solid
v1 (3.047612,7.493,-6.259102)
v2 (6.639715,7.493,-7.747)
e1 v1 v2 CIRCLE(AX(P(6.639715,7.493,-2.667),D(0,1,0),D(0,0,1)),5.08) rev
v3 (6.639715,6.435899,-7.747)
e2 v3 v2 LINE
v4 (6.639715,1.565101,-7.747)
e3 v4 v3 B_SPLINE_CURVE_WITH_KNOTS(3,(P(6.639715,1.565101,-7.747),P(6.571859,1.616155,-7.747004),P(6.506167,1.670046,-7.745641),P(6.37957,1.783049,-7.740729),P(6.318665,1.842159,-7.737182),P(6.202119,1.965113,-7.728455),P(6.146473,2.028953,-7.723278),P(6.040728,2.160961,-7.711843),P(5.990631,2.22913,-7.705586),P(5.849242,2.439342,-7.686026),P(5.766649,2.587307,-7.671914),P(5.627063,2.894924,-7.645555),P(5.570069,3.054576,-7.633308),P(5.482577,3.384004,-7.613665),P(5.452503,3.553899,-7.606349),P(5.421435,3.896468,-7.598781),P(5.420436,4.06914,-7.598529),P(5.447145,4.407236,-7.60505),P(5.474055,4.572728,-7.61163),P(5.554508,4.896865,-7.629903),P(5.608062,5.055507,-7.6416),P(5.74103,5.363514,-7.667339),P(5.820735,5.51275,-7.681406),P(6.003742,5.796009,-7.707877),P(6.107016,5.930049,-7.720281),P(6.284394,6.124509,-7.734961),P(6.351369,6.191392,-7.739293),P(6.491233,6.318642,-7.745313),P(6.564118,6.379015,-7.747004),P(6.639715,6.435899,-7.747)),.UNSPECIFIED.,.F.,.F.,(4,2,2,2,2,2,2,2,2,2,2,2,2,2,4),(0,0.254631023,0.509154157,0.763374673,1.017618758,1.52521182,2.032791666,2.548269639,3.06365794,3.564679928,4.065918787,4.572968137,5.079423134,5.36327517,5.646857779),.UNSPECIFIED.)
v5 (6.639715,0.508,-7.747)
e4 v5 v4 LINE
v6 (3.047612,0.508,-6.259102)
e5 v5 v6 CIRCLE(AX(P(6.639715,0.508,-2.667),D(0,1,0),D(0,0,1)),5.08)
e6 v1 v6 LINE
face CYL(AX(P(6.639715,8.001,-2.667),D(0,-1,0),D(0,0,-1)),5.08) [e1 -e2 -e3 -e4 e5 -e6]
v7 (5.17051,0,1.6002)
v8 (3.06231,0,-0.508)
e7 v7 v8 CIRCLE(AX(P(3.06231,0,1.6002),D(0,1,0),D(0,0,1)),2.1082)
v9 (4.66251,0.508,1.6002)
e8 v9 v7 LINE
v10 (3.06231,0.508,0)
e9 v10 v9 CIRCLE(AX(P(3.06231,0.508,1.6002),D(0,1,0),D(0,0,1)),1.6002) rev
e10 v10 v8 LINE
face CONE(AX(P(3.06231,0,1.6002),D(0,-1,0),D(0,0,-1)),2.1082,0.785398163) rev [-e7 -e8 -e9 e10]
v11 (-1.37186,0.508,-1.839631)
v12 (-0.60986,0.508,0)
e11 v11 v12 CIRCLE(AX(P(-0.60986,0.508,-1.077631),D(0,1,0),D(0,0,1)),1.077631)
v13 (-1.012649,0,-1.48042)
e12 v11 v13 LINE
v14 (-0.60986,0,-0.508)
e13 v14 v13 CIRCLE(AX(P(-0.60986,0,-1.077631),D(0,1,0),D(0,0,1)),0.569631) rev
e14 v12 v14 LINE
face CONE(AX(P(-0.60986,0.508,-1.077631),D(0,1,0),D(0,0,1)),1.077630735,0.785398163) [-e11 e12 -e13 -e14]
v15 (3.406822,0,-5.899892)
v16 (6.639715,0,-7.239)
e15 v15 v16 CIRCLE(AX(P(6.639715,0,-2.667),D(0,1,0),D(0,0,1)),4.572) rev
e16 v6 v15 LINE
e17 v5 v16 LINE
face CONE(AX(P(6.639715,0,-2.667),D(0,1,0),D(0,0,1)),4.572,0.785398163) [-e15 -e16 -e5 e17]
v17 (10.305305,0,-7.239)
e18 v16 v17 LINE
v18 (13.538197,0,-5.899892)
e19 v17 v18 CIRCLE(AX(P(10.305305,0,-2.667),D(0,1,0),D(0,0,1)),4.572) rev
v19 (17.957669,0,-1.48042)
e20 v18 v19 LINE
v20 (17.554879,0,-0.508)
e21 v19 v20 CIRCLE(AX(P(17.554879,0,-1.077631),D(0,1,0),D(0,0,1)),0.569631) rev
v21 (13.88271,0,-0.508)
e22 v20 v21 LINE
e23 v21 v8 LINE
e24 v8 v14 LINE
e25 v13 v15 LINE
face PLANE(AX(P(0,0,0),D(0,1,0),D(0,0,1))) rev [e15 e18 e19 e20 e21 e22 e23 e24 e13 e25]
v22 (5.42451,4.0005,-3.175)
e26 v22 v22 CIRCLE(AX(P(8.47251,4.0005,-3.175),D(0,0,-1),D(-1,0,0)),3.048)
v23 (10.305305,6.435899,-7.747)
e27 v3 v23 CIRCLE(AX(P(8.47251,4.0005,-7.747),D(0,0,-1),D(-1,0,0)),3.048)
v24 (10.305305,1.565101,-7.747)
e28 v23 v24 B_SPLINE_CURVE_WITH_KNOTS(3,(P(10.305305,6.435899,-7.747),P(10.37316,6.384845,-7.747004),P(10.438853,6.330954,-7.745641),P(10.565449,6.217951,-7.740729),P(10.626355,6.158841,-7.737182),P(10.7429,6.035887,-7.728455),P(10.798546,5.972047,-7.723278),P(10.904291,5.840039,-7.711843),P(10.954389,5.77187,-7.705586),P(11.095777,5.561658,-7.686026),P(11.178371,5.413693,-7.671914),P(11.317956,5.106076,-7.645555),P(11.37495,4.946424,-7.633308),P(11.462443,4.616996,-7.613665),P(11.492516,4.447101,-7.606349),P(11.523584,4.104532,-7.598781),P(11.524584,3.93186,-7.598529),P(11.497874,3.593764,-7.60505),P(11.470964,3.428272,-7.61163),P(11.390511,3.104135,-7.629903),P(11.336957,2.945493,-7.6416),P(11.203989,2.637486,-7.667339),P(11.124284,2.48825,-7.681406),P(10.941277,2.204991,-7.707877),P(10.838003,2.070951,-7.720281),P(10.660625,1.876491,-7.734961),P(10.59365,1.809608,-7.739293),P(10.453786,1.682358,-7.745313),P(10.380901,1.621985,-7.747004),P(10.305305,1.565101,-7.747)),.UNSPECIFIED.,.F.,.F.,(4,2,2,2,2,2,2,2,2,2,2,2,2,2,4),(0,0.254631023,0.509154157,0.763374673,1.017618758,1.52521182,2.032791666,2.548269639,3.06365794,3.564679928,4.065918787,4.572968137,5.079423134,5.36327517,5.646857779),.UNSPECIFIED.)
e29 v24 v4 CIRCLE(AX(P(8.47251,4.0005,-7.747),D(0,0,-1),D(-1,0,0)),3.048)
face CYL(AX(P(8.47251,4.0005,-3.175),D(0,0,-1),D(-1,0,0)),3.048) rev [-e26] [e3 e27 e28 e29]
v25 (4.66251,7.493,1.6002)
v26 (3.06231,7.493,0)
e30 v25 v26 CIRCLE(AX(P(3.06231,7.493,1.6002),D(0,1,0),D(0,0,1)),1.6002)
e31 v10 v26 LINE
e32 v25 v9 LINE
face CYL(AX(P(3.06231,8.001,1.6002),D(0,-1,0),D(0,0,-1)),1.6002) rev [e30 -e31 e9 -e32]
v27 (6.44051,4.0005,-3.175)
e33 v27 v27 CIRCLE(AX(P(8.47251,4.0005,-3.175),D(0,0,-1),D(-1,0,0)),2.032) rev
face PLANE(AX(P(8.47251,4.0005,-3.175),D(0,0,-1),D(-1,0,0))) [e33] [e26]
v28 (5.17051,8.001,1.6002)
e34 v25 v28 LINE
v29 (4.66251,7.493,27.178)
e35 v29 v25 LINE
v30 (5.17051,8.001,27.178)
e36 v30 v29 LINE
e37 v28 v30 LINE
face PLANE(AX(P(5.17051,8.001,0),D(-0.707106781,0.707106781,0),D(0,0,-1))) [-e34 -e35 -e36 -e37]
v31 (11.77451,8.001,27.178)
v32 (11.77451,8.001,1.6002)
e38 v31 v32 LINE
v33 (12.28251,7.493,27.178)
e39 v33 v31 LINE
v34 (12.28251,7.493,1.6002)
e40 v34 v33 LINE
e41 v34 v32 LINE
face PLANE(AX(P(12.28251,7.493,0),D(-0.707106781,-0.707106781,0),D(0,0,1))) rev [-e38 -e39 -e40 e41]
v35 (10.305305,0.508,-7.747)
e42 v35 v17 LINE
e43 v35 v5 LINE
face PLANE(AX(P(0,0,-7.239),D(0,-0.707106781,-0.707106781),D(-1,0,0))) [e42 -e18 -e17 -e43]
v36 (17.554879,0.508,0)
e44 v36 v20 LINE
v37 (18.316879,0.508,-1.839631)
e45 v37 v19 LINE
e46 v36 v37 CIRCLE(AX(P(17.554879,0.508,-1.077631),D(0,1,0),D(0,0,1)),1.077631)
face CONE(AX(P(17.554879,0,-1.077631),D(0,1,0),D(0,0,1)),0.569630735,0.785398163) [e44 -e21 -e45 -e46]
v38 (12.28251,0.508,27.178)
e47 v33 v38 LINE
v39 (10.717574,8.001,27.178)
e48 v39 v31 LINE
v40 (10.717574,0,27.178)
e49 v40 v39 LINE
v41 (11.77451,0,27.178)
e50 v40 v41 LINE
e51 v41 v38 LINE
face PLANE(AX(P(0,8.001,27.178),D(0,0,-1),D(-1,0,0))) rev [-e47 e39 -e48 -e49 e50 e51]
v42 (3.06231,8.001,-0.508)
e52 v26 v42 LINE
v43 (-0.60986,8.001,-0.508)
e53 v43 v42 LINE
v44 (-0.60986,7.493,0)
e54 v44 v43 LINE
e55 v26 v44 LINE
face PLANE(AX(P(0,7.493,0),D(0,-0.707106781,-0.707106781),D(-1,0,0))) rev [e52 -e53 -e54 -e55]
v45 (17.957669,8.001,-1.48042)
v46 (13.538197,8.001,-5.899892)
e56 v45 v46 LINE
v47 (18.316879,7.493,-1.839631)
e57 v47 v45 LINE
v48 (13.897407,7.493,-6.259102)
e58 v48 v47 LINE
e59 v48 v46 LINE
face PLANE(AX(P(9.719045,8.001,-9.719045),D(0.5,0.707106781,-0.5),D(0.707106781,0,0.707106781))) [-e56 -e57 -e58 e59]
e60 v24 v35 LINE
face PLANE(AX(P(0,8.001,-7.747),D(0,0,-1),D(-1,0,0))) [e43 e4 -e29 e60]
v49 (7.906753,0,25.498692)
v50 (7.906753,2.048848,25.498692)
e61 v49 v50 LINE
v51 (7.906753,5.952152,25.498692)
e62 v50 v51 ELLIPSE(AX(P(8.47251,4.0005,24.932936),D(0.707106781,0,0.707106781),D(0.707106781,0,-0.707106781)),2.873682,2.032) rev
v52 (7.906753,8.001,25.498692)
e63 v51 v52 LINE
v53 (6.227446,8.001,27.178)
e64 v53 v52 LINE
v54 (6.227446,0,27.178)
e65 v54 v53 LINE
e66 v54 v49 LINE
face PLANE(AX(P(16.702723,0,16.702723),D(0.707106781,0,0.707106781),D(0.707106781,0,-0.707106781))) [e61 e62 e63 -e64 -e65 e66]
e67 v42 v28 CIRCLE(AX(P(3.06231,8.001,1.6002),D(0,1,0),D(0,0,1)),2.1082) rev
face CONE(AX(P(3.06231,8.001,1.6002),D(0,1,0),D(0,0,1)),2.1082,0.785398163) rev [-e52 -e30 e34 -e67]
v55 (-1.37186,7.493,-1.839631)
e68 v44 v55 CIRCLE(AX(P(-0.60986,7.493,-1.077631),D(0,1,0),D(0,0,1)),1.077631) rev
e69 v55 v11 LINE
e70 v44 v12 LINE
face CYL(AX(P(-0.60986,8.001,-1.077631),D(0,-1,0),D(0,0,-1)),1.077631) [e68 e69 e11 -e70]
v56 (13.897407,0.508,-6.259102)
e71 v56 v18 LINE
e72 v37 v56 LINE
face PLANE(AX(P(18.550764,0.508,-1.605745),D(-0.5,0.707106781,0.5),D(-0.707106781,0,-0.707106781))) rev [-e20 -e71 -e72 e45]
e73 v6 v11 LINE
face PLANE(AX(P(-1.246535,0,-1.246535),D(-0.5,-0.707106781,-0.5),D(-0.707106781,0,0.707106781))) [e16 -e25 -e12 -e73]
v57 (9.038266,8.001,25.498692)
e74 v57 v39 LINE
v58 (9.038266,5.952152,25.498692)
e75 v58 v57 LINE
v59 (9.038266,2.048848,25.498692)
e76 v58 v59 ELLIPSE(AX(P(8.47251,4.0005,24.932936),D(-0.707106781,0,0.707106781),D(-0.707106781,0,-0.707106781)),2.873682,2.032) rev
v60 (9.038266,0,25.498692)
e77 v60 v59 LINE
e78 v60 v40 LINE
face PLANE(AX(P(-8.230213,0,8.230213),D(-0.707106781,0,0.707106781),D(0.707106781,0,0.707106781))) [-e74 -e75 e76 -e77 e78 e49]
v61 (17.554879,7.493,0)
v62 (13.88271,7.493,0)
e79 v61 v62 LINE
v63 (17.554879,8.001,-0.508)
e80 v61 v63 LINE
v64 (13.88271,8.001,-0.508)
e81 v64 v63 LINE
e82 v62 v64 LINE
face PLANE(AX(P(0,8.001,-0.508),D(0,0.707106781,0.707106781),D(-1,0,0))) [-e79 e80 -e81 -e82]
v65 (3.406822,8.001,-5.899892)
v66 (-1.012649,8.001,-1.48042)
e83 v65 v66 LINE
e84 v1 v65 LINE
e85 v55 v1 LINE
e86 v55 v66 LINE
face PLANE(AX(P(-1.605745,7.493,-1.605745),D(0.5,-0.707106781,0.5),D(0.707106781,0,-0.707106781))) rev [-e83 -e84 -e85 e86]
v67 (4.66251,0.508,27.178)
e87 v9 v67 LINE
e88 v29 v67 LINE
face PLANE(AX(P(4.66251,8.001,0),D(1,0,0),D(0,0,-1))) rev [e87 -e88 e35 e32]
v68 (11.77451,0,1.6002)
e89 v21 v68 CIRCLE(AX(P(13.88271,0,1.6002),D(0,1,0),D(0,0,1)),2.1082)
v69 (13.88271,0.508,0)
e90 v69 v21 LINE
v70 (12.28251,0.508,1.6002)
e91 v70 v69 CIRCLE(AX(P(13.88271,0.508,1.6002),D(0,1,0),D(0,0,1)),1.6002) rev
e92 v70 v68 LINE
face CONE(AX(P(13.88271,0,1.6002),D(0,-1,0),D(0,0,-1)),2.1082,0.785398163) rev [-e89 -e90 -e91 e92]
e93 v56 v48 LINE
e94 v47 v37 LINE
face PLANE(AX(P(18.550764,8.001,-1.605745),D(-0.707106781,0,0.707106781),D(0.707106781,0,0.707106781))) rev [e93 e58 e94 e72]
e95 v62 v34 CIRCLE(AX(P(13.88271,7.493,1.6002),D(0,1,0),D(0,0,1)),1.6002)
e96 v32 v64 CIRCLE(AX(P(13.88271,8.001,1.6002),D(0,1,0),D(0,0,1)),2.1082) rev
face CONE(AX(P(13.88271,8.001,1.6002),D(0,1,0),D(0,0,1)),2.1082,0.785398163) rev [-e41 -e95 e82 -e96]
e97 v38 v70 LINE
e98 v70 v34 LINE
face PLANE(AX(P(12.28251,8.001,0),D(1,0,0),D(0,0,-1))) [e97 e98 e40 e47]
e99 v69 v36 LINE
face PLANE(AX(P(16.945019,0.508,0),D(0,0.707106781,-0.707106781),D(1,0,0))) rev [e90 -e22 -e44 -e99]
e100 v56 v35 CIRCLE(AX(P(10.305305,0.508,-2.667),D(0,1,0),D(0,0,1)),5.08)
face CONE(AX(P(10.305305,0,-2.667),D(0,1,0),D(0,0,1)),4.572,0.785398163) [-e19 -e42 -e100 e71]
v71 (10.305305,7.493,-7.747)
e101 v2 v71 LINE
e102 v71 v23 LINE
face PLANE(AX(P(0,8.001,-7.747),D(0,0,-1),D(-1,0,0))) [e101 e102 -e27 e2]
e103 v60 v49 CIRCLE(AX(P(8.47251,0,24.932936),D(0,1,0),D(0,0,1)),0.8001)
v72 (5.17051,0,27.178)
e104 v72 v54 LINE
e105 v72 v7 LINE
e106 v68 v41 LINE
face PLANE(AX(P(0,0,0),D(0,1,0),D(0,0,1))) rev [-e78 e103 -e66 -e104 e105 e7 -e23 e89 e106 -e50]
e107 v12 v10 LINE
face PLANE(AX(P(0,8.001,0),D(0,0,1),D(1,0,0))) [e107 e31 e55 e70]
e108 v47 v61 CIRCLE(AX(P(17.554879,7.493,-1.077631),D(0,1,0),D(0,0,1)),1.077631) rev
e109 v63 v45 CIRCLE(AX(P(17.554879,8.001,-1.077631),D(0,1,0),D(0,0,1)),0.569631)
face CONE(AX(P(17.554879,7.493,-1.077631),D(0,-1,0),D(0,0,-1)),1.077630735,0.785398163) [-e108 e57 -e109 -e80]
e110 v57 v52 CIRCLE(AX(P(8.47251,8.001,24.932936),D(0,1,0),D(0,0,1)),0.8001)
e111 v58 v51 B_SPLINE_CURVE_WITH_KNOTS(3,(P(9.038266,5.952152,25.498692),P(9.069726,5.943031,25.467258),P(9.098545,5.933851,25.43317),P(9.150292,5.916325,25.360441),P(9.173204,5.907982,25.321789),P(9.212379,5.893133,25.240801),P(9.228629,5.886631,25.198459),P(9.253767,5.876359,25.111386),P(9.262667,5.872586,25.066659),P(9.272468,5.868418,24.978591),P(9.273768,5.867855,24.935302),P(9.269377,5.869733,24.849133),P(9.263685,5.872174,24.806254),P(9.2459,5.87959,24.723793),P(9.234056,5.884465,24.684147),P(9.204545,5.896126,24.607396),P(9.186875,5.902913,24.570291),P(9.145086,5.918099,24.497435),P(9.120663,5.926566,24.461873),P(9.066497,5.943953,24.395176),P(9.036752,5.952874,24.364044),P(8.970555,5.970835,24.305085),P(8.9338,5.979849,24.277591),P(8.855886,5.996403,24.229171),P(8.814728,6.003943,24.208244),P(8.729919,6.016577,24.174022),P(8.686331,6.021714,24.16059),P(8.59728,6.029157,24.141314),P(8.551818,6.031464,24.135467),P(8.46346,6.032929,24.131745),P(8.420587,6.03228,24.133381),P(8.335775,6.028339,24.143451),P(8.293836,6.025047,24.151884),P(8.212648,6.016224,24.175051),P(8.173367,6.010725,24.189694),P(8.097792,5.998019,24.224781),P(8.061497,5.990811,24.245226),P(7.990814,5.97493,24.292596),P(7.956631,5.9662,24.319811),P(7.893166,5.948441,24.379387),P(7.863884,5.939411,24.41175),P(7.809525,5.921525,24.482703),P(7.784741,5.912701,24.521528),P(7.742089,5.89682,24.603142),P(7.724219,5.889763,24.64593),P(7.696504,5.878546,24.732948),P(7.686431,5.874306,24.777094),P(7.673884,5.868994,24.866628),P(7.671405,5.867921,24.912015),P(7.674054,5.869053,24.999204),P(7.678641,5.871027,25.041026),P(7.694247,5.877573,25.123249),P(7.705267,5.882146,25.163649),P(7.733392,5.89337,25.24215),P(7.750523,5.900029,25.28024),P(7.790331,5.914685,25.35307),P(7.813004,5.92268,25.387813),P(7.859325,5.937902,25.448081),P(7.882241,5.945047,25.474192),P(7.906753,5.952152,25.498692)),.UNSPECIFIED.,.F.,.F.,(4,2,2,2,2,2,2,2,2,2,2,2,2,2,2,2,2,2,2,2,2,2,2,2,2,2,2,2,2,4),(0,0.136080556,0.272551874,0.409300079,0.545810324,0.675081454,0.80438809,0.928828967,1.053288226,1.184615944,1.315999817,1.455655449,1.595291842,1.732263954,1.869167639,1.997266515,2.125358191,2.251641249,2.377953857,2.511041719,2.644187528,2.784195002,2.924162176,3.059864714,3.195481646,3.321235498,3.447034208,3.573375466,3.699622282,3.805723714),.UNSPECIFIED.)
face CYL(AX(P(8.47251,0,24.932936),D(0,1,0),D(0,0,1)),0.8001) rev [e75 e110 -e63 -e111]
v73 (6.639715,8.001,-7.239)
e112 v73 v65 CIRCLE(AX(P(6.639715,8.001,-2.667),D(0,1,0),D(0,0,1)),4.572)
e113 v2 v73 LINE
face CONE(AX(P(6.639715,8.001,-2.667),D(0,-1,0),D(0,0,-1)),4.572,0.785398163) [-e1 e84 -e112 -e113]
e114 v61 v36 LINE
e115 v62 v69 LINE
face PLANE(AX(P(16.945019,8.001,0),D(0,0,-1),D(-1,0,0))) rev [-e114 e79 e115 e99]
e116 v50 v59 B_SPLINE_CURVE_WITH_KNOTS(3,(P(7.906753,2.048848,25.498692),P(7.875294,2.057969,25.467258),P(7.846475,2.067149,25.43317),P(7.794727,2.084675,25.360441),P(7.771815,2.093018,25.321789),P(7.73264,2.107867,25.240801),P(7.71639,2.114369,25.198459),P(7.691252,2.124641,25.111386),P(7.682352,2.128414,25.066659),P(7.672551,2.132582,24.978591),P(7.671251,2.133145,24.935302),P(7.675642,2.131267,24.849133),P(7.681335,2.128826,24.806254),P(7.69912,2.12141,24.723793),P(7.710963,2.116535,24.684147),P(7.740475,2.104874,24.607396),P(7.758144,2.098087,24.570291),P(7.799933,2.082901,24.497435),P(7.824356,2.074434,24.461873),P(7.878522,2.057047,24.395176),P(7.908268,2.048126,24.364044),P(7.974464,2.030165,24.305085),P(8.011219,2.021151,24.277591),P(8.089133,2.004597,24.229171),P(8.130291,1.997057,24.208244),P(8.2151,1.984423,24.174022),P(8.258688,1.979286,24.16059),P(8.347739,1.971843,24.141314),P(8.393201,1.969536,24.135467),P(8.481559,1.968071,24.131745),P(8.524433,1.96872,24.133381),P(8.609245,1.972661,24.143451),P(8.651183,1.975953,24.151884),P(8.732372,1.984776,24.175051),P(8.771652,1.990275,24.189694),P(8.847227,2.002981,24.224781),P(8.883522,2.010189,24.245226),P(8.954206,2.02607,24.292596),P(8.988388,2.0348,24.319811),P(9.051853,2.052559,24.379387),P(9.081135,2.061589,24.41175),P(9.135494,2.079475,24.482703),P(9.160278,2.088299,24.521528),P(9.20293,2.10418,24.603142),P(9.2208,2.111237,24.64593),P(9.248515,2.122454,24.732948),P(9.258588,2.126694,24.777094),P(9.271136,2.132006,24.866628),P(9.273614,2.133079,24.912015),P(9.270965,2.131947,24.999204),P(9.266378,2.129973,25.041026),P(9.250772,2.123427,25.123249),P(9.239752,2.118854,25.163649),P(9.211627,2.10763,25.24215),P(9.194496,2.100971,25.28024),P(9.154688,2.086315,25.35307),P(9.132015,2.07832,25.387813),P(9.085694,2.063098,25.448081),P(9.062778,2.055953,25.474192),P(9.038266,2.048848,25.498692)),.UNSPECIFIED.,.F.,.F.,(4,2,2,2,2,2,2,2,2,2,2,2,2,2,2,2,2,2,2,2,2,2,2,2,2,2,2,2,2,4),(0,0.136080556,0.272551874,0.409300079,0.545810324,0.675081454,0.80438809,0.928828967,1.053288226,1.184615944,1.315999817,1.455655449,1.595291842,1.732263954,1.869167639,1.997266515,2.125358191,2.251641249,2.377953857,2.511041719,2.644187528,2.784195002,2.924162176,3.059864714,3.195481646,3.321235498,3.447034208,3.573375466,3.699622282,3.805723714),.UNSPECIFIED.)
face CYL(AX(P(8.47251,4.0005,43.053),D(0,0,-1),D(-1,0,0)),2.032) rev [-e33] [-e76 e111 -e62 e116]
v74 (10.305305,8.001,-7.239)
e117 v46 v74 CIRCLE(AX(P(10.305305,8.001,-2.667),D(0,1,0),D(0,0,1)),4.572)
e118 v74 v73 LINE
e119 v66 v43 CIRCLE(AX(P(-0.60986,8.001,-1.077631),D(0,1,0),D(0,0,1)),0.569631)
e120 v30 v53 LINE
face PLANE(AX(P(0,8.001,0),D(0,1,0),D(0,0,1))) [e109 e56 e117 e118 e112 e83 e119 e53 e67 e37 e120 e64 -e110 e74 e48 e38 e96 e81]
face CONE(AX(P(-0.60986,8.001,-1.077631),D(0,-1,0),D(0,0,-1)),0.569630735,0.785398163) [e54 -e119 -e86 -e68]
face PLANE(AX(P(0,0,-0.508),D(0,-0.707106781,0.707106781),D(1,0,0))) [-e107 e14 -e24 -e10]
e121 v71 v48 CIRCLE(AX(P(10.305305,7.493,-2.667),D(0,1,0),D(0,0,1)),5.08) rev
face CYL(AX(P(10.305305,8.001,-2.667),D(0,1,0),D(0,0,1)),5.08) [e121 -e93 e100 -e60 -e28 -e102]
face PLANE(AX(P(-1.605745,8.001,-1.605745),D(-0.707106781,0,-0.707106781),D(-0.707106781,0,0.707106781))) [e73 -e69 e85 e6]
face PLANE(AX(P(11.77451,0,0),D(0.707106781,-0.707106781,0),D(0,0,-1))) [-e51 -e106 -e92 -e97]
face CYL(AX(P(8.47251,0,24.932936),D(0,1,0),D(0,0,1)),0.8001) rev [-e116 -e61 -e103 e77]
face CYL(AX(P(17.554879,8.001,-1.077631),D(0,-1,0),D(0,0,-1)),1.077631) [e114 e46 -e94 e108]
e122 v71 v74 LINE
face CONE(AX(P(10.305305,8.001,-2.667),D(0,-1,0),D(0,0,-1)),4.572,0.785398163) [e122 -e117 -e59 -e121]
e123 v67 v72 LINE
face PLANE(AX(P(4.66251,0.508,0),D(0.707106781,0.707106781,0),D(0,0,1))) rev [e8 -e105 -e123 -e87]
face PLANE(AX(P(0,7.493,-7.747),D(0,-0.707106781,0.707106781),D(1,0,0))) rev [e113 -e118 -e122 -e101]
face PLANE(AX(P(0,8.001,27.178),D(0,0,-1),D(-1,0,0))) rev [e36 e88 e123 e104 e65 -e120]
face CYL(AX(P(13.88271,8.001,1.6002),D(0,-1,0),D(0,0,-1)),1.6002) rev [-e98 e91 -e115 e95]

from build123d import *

# Parameters (mm, degrees)
SKETCH1_R           = 1.077630735
BOSS_EXTRUDE1_DEPTH = 8.001
SKETCH4_R           = 2.032
CUT_EXTRUDE1_DEPTH  = 50.8
SKETCH5_R           = 3.048
CUT_EXTRUDE2_DEPTH  = 4.572
CUT_EXTRUDE4_DEPTH  = 34.909144773
FILLET2_R           = 5.08
FILLET3_R           = 1.6002
CHAMFER1_SIZE       = 0.508


with BuildPart() as part:
    # Sketch1 → Boss-Extrude1 (new body)
    with BuildSketch(Plane(origin=(0, 0, 0), x_dir=(1, 0, 0), z_dir=(0, 1, 0))):
        with BuildLine():
            Line((-0.609859659, 0), (0, 0))
            Line((0, 0), (4.662509606, 0))
            Line((4.662509606, 0), (4.662509606, -27.178))
            Line((4.662509606, -27.178), (8.472509606, -27.178))
            Line((8.472509606, -27.178), (8.472509606, 7.747))
            Line((8.472509606, 7.747), (4.535509606, 7.747))
            Line((4.535509606, 7.747), (-1.371859637, 1.839630756))
            ThreePointArc((-1.371859637, 1.839630756), (-0.197468217, 2.073231708), (0.467771075, 1.077630735))
            ThreePointArc((0.467771075, 1.077630735), (0.152140341, 0.315630735), (-0.609859659, 0))
        make_face()
        with Locations((-0.609859659, 1.077630735)):
            Circle(SKETCH1_R)
    boss_extrude1 = extrude(amount=BOSS_EXTRUDE1_DEPTH)

    # Mirror1: Boss-Extrude1 across plane
    add(boss_extrude1.mirror(Plane(origin=(8.472509606, 0, 0), x_dir=(0, 0, 1), z_dir=(1, 0, 0))))

    # Sketch4 → Cut-Extrude1 (cut)
    with BuildSketch(Plane(origin=(0, 0, -7.747), x_dir=(-1, 0, 0), z_dir=(0, 0, -1))):
        with Locations((-8.472509606, 4.0005)):
            Circle(SKETCH4_R)
    extrude(amount=-CUT_EXTRUDE1_DEPTH, mode=Mode.SUBTRACT)

    # Sketch5 → Cut-Extrude2 (cut)
    with BuildSketch(Plane(origin=(0, 0, -7.747), x_dir=(-1, 0, 0), z_dir=(0, 0, -1))):
        with Locations((-8.472509606, 4.0005)):
            Circle(SKETCH5_R)
    extrude(amount=-CUT_EXTRUDE2_DEPTH, mode=Mode.SUBTRACT)

    # Sketch7 → Cut-Extrude4 (cut, through all)
    with BuildSketch(Plane(origin=(0, 8.001, 0), x_dir=(1, 0, 0), z_dir=(0, 1, 0))):
        with BuildLine():
            ThreePointArc((9.272609606, -24.93293597), (8.166324592, -24.193739956), (7.906753471, -25.498692105))
            Line((7.906753471, -25.498692105), (8.472509606, -24.93293597))
            Line((8.472509606, -24.93293597), (9.038265742, -25.498692105))
            ThreePointArc((9.038265742, -25.498692105), (9.21170562, -25.239120984), (9.272609606, -24.93293597))
        make_face()
        with BuildLine():
            Line((8.472509606, -24.93293597), (7.906753471, -25.498692105))
            ThreePointArc((7.906753471, -25.498692105), (8.472509606, -25.73303597), (9.038265742, -25.498692105))
            Line((9.038265742, -25.498692105), (8.472509606, -24.93293597))
        make_face()
        with BuildLine():
            Line((7.906753471, -25.498692105), (6.227445576, -27.178))
            Line((6.227445576, -27.178), (10.717573636, -27.178))
            Line((10.717573636, -27.178), (9.038265742, -25.498692105))
            ThreePointArc((9.038265742, -25.498692105), (8.472509606, -25.73303597), (7.906753471, -25.498692105))
        make_face()
    extrude(amount=-CUT_EXTRUDE4_DEPTH, mode=Mode.SUBTRACT)

    # Fillet2
    # the kernel refuses this fillet: 5.08 mm, written as the material it takes off along each edge
    with BuildSketch(Plane(origin=(4.535509606, -5.260512242, -7.747), x_dir=(-0.7071067811865458, 0, 0.7071067811865495), z_dir=(0, 1, 0)), Plane(origin=(12.409509606, -5.260512242, -7.747), x_dir=(-1, 0, 0), z_dir=(0, 1, 0))) as fillet2_piece_1:
        with BuildLine():
            CenterArc((FILLET2_R * 0.414213562373, FILLET2_R), FILLET2_R, 225, 45)
            Line((-FILLET2_R * 0.292893218813, FILLET2_R * 0.292893218813), (0, 0))
            Line((0, 0), (FILLET2_R * 0.414213562373, 0))
        make_face()
    extrude(amount=18.522024484, mode=Mode.SUBTRACT)

    # Fillet3
    fillet3_edges = [part.edges().sort_by_distance(p)[0] for p in [
        (4.662509606, 4.0005, 0),
        (12.282509606, 4.0005, 0),
    ]]
    fillet(fillet3_edges, radius=FILLET3_R)

    # Chamfer1
    chamfer1_edges = [part.edges().sort_by_distance(p)[0] for p in [
        (15.718794239, 0, 0),
        (15.718794239, 8.001, 0),
        (12.282509606, 0, 14.3891),
        (12.282509606, 8.001, 14.3891),
        (4.662509606, 0, 14.3891),
        (4.662509606, 8.001, 14.3891),
        (-1.605460644, 0, -0.66523932),
        (1.226224973, 0, 0),
        (1.226224973, 8.001, 0),
        (12.751197335, 0, 0.468687729),
        (12.751197335, 8.001, 0.468687729),
        (4.193821877, 0, 0.468687729),
        (4.193821877, 8.001, 0.468687729),
        (0.837876209, 0, -4.049366602),
        (16.107143004, 0, -4.049366602),
        (18.550479857, 8.001, -0.66523932),
        (16.107143004, 8.001, -4.049366602),
        (18.550479857, 0, -0.66523932),
        (0.837876209, 8.001, -4.049366602),
        (-1.605460644, 8.001, -0.66523932),
        (8.472509606, 0, -7.747),
        (12.249336546, 0, -7.360308025),
        (4.695682667, 0, -7.360308025),
        (8.472509606, 8.001, -7.747),
        (12.249336546, 8.001, -7.360308025),
        (4.695682667, 8.001, -7.360308025),
    ]]
    chamfer(chamfer1_edges, length=CHAMFER1_SIZE)


solid = part.part
